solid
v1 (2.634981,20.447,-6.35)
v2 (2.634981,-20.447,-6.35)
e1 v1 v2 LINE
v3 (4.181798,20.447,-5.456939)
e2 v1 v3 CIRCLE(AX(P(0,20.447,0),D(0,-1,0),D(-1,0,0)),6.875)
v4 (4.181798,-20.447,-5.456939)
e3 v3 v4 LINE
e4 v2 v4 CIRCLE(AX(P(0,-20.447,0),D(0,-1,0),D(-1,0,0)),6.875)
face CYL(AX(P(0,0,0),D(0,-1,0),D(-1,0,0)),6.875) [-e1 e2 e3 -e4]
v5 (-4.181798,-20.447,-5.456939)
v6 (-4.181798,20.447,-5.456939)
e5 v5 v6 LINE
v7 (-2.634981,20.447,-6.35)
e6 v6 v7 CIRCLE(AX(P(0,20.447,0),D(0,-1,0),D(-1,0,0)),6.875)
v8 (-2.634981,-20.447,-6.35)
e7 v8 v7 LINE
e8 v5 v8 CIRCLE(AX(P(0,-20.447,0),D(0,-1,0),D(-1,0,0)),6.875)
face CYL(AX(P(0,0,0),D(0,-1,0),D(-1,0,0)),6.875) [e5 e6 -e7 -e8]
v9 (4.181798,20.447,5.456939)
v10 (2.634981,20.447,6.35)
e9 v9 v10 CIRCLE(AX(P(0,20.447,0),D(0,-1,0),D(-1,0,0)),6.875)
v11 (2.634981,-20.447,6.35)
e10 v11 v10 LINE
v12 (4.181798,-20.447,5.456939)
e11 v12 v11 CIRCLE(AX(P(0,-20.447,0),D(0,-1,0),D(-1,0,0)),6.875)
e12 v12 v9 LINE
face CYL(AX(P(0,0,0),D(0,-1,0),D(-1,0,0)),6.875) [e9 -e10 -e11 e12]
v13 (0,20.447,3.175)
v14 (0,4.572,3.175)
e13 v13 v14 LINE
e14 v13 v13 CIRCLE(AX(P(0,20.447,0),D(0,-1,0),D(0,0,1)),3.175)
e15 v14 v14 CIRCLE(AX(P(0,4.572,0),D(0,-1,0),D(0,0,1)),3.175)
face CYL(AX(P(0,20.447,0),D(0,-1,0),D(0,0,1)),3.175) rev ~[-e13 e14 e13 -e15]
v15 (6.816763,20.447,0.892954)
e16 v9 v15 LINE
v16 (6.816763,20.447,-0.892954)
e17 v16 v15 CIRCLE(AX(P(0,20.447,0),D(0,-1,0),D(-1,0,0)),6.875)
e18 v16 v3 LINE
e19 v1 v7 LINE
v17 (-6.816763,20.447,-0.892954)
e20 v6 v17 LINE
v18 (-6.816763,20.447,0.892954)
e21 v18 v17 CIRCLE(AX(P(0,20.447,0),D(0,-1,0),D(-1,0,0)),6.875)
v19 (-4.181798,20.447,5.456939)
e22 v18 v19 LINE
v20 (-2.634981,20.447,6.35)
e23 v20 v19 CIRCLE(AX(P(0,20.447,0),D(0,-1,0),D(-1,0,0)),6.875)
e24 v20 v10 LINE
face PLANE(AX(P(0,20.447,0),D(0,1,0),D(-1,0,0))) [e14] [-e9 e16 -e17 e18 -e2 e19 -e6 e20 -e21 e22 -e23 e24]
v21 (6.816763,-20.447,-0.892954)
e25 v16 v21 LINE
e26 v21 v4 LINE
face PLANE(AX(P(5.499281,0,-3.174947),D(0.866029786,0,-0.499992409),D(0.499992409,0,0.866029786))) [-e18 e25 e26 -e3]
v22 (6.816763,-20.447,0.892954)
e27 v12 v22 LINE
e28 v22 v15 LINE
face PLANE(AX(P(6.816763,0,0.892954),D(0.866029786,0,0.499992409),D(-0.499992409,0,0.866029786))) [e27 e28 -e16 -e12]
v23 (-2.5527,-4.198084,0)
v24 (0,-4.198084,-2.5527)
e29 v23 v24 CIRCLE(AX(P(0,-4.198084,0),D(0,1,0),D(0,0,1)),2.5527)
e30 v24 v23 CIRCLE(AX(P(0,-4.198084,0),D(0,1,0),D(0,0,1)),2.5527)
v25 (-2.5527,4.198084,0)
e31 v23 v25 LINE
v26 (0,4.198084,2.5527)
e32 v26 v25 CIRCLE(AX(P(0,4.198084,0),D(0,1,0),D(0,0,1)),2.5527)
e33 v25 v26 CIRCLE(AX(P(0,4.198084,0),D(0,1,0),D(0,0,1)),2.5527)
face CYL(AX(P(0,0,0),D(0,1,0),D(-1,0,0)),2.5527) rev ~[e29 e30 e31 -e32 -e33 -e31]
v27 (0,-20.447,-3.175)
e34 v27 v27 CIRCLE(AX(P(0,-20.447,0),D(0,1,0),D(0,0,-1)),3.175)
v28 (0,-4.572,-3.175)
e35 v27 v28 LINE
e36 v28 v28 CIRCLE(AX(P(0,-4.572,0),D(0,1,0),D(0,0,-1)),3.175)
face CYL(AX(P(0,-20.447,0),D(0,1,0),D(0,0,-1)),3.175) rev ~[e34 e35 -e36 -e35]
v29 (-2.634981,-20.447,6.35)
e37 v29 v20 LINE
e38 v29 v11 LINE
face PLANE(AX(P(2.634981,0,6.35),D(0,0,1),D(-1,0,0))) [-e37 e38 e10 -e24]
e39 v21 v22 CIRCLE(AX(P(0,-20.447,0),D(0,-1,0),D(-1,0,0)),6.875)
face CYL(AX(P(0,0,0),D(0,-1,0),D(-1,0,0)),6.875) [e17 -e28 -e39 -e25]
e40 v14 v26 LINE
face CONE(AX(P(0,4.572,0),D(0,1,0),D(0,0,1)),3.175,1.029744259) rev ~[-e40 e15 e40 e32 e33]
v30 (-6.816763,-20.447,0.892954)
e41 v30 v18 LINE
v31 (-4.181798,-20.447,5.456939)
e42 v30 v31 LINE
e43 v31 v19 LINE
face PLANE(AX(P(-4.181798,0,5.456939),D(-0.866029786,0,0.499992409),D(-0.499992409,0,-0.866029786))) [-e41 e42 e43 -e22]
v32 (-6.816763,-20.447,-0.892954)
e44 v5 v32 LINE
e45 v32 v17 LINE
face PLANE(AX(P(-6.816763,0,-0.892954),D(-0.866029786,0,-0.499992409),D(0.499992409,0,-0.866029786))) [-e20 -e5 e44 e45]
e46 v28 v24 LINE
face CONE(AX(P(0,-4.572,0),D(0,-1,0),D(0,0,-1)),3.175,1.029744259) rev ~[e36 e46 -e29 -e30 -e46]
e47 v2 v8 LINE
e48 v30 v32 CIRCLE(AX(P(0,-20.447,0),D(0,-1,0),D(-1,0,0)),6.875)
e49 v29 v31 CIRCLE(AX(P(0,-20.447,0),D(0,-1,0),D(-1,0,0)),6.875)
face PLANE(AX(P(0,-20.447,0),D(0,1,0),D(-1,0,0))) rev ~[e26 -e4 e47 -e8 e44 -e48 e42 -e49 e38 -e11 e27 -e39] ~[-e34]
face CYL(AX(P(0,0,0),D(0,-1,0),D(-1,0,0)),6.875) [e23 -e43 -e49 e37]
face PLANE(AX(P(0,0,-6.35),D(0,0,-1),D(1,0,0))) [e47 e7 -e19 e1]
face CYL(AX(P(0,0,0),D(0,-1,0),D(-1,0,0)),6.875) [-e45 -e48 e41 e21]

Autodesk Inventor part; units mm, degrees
ref_plane "YZ Plane" through (0, 0, 0) normal (1, 0, 0) x (0, 1, 0)
ref_plane "XZ Plane" through (0, 0, 0) normal (0, 1, 0) x (-1, 0, 0)
ref_plane "XY Plane" through (0, 0, 0) normal (0, 0, 1) x (1, 0, 0)
sketch "Sketch1" plane through (0, 0, 0) normal (0, 1, 0) x (-1, 0, 0)
  line L0 (-7.3323, 0) -> (-3.6662, 6.35)
  line L1 (-3.6662, 6.35) -> (3.6662, 6.35)
  line L2 (3.6662, 6.35) -> (7.3323, 0)
  line L3 (7.3323, 0) -> (3.6662, -6.35)
  line L4 (3.6662, -6.35) -> (-3.6662, -6.35)
  line L5 (-3.6662, -6.35) -> (-7.3323, 0)
  circle A0 centre (0, 0) radius 6.875
  circle A1 centre (0, 0) radius 6.35
  line L6 (-2.7496, -4.7625) -> (2.7496, -4.7625)
  line L7 (2.7496, -4.7625) -> (5.4993, 0)
  line L8 (5.4993, 0) -> (2.7496, 4.7625)
  line L9 (2.7496, 4.7625) -> (-2.7496, 4.7625)
  line L10 (-2.7496, 4.7625) -> (-5.4993, 0)
  line L11 (-5.4993, 0) -> (-2.7496, -4.7625)
  circle A2 centre (0, 0) radius 4.7625
  circle A3 centre (0, 0) radius 5.125
  circle A4 centre (0, 0) radius 9.525
  circle A5 centre (0, 0) radius 5.9436
  circle A6 centre (0, 0) radius 2.5527
  circle A7 centre (0, 0) radius 2.0193
  circle A8 centre (0, 0) radius 3.175
  circle A9 centre (0, 0) radius 8.7313
  point P0 (-4.1818, 5.457)
  point P1 (-2.635, 6.35)
  point P2 (-6.8168, -0.893)
  point P3 (-6.8168, 0.893)
  point P4 (-2.635, -6.35)
  point P5 (-4.1818, -5.457)
  point P6 (4.1818, -5.457)
  point P7 (2.635, -6.35)
  point P8 (6.8168, -0.893)
  point P9 (6.8168, 0.893)
  point P10 (2.635, 6.35)
  point P11 (4.1818, 5.457)
  point P12 (3.1778, -4.0208)
  point P13 (1.8932, -4.7625)
  point P14 (5.071, -0.7417)
  point P15 (5.071, 0.7417)
  point P16 (1.8932, 4.7625)
  point P17 (3.1778, 4.0208)
  point P18 (-3.1778, 4.0208)
  point P19 (-1.8932, 4.7625)
  point P20 (-5.071, -0.7417)
  point P21 (-5.071, 0.7417)
  point P22 (-1.8932, -4.7625)
  point P23 (-3.1778, -4.0208)
  dimension "d0" = 12.7
  dimension "d1" = 13.75
  dimension "d2" = 12.7
  dimension "d3" = 9.525
  dimension "d4" = 10.25
  dimension "d5" = 19.05
  dimension "d6" = 11.8872
  dimension "d7" = 5.1054
  dimension "d8" = 4.0386
  dimension "d9" = 6.35
  dimension "d153" = 0.7937
extrude "BaseProfile625Round" add sketch "Sketch1" along normal mid plane 40.894 contours L0 A0 L5 | A0 L0 | L0 A1 L5 A0 | L5 A0 | L0 A0 L1 A1 | A1 | L0 L1 A0 | A1 L4 A0 L5 | A0 L4 L5 | L1 A0 | L1 A0 L2 A1 | A1 L3 A0 L4 | L4 A0 | L1 L2 A0 | L2 A0 | L2 A0 L3 A1 | A0 L3 L4 | L3 A0 | L2 L3 A0 | L11 A3 L6 | A3 L11 A2 L6 | L6 A3 | A3 L11 | A2 L7 A3 L6 | A2 | A3 L7 L6 | L11 A3 L10 A2 | L11 L10 A3 | L7 A3 | A2 L8 A3 L7 | L10 A3 | L10 A3 L9 A2 | A3 L8 L7 | L10 L9 A3 | L9 A3 | L9 A3 L8 A2 | L8 A3 | L9 L8 A3 | A4 | A5 | A6 | A7 | A8 | A9
extrude "BaseProfileRoundTube" [suppressed]
extrude "BaseProfile500Hex" [suppressed]
extrude "BaseProfile500Thunderhex" cut sketch "Sketch1" along normal mid plane 914.4 contours L0 A0 L5 | A0 L0 | L5 A0 | L0 L1 A0 | A0 L4 L5 | L1 A0 | L4 A0 | L1 L2 A0 | L2 A0 | A0 L3 L4 | L3 A0 | L2 L3 A0 | A4 | A9
extrude "BaseProfile500Round" [suppressed]
extrude "BaseProfile375Hex" [suppressed]
extrude "BaseProfile375Thunderhex" [suppressed]
extrude "BaseProfile375Round" [suppressed]
extrude "TopShaftProfile1Hex500" [suppressed]
extrude "TopShaftProfile1ThunderHex500" [suppressed]
extrude "TopShaftProfile1Round500" [suppressed]
extrude "TopShaftProfile1Hex375" [suppressed]
extrude "TopShaftProfile1ThunderHex375" [suppressed]
extrude "TopShaftProfile1Round375" [suppressed]
extrude "TopShaftProfile2ThunderHex500" [suppressed]
extrude "TopShaftProfile2Round500" [suppressed]
extrude "TopShaftProfile2Hex375" [suppressed]
extrude "TopShaftProfile2ThunderHex375" [suppressed]
extrude "TopShaftProfile2Round375" [suppressed]
sketch "Sketch2" plane through (0, 0, 0) normal (1, 0, 0) x (0, 1, 0)
  line L0 (-40.8112, 0) -> (47.9537, 0) projected
  line L1 (0, -2.6658) -> (0, 15.9951) projected
  line L2 (27.5895, 4.4704) -> (28.7325, 4.4704)
  line L3 (28.7325, 4.4704) -> (28.7325, 4.7625)
  line L4 (28.7325, 4.7625) -> (29.812, 4.7625)
  line L5 (29.812, 4.7625) -> (30.32, 4.2545)
  line L6 (30.32, 4.2545) -> (30.32, 0)
  line L7 (27.5895, 4.4704) -> (27.5895, 0) construction
  line L8 (27.5895, 4.4704) -> (27.5895, 4.7625)
  line L9 (27.5895, 4.7625) -> (20.447, 4.7625)
  line L10 (20.447, 4.7625) -> (20.447, 0)
  line L11 (20.447, 0) -> (30.32, 0)
  line L12 (-20.447, 5.9436) -> (-21.59, 5.9436)
  line L13 (-21.59, 5.9436) -> (-21.59, 6.35)
  line L14 (-21.59, 6.35) -> (-22.6695, 6.35)
  line L15 (-22.6695, 6.35) -> (-23.1775, 5.842)
  line L16 (-23.1775, 5.842) -> (-23.1775, 0)
  line L17 (-20.447, 5.9436) -> (-20.447, 0) construction
  line L18 (-20.447, 5.9436) -> (-20.447, 6.35)
  line L19 (-20.447, 6.35) -> (-20.447, 6.35)
  line L20 (-20.447, 6.35) -> (-20.447, 0)
  line L21 (-20.447, 0) -> (-23.1775, 0)
  line L22 (0, 0) -> (0, 13.3292)
  line L23 (20.447, 0) -> (20.447, 4.7625)
  point P0 (25.4, 5.9436)
  point P1 (-23.1775, 0)
  point P2 (-20.447, 0)
  point P3 (30.955, 4.7625)
  point P4 (-17.4625, 6.2865)
  point P5 (25.4, 4.7625)
  point P6 (19.4005, 4.7625)
  point P7 (-25.4, 4.7625)
  point P8 (-26.543, 4.7625)
  dimension "TopBearingRoundDia2" = 9.525
  dimension "d65" = 45
  dimension "RetainingRingChamferSize2" = 0.508
  dimension "d72" = 20.447
  dimension "TopSnapRingDia2" = 8.9408
  dimension "d119" = 0.508
  dimension "d120" = 45
  dimension "d135" = 20.447
  dimension "d138" = 30.32
  dimension "d139" = 28.7325
  dimension "d140" = 27.5895
  dimension "d141" = 11.8872
  dimension "d142" = 12.7
  dimension "d143" = 21.59
  dimension "d144" = 20.447
  dimension "d145" = 23.1775
revolve "TopRetentionGroove&BearingRound" [suppressed]
sketch "Sketch3" plane through (0, 20.447, 0) normal (0, 1, 0) x (1, 0, 0)
  point P0 (0, 0)
  point P1 (0, 0)
hole "TopShaftTappedHole" at (0, 20.447, 0) direction (0, -1, 0) diameter 6.35 depth 15.875 tip angle 118
thread "TopShaftThread" size "1/4-20 UNC" class "2B" standard "ANSI Unified Screw Threads" length 12.7
extrude "BottomShaftProfile1Hex500" [suppressed]
extrude "BottomShaftProfile1ThunderHex500" [suppressed]
extrude "BottomShaftProfile1Round500" [suppressed]
extrude "BottomShaftProfile1Hex375" [suppressed]
extrude "BottomShaftProfile1ThunderHex375" [suppressed]
extrude "BottomShaftProfile2ThunderHex500" [suppressed]
extrude "BottomShaftProfile1Round375" [suppressed]
extrude "BottomShaftProfile2Round500" [suppressed]
extrude "BottomShaftProfile2Hex375" [suppressed]
extrude "BottomShaftProfile2ThunderHex375" [suppressed]
extrude "BottomShaftProfile2Round375" [suppressed]
sketch "Sketch4" plane through (0, -20.447, 0) normal (0, -1, 0) x (1, 0, 0)
  point P0 (0, 0)
  point P1 (0, 0)
hole "BottomShaftTappedHole" at (0, -20.447, 0) direction (0, 1, 0) diameter 6.35 depth 15.875 tip angle 118
thread "BottomShaftThread" size "1/4-20 UNC" class "2B" standard "ANSI Unified Screw Threads" length 12.7
revolve "BottomRetentionGroove&BearingRound" [suppressed]
extrude "BaseProfile375ThunderhexHole" [suppressed]
extrude "BaseProfile500ThunderhexHole" cut sketch "Sketch1" along normal mid plane 914.4 contours A6 | A7
equation "\"d18\" = BottomShaftProfile1Depth + TopShaftProfile1Depth + BaseShaftLength + TopShaftProfile2Depth + BottomShaftProfile2Depth"
equation "\"d72\" = 0.5 * d18"
equation "\"BaseShaftLength\" = 40.894"
equation "\"TopShaftProfile1Depth\" = 0"
equation "\"TopShaftProfile2Depth\" = 0"
equation "\"BottomShaftProfile1Depth\" = 0"
equation "\"BottomShaftProfile2Depth\" = 0"
equation "\"TopShaftHoleDia\" = 6.35"
equation "\"BottomShaftHoleDia\" = 6.35"
equation "\"TopBearingRoundDia\" = 9.525"
equation "\"TopGrooveWidth\" = 1.143"
equation "\"TopBearingRoundDistance\" = 7.14248"
equation "\"TopSnapRingDia\" = 8.9408"
equation "\"BottomBearingRoundDia\" = 12.7"
equation "\"BottomGrooveWidth\" = 1.143"
equation "\"BottomBearingRoundDistance\" = 0"
equation "\"BottomSnapRingDia\" = 11.8872"
equation "\"RoundTubeDia\" = 19.05"
properties part number "GreyT Claw 2 Gearbox Shaft" material "Aluminum 6061"
